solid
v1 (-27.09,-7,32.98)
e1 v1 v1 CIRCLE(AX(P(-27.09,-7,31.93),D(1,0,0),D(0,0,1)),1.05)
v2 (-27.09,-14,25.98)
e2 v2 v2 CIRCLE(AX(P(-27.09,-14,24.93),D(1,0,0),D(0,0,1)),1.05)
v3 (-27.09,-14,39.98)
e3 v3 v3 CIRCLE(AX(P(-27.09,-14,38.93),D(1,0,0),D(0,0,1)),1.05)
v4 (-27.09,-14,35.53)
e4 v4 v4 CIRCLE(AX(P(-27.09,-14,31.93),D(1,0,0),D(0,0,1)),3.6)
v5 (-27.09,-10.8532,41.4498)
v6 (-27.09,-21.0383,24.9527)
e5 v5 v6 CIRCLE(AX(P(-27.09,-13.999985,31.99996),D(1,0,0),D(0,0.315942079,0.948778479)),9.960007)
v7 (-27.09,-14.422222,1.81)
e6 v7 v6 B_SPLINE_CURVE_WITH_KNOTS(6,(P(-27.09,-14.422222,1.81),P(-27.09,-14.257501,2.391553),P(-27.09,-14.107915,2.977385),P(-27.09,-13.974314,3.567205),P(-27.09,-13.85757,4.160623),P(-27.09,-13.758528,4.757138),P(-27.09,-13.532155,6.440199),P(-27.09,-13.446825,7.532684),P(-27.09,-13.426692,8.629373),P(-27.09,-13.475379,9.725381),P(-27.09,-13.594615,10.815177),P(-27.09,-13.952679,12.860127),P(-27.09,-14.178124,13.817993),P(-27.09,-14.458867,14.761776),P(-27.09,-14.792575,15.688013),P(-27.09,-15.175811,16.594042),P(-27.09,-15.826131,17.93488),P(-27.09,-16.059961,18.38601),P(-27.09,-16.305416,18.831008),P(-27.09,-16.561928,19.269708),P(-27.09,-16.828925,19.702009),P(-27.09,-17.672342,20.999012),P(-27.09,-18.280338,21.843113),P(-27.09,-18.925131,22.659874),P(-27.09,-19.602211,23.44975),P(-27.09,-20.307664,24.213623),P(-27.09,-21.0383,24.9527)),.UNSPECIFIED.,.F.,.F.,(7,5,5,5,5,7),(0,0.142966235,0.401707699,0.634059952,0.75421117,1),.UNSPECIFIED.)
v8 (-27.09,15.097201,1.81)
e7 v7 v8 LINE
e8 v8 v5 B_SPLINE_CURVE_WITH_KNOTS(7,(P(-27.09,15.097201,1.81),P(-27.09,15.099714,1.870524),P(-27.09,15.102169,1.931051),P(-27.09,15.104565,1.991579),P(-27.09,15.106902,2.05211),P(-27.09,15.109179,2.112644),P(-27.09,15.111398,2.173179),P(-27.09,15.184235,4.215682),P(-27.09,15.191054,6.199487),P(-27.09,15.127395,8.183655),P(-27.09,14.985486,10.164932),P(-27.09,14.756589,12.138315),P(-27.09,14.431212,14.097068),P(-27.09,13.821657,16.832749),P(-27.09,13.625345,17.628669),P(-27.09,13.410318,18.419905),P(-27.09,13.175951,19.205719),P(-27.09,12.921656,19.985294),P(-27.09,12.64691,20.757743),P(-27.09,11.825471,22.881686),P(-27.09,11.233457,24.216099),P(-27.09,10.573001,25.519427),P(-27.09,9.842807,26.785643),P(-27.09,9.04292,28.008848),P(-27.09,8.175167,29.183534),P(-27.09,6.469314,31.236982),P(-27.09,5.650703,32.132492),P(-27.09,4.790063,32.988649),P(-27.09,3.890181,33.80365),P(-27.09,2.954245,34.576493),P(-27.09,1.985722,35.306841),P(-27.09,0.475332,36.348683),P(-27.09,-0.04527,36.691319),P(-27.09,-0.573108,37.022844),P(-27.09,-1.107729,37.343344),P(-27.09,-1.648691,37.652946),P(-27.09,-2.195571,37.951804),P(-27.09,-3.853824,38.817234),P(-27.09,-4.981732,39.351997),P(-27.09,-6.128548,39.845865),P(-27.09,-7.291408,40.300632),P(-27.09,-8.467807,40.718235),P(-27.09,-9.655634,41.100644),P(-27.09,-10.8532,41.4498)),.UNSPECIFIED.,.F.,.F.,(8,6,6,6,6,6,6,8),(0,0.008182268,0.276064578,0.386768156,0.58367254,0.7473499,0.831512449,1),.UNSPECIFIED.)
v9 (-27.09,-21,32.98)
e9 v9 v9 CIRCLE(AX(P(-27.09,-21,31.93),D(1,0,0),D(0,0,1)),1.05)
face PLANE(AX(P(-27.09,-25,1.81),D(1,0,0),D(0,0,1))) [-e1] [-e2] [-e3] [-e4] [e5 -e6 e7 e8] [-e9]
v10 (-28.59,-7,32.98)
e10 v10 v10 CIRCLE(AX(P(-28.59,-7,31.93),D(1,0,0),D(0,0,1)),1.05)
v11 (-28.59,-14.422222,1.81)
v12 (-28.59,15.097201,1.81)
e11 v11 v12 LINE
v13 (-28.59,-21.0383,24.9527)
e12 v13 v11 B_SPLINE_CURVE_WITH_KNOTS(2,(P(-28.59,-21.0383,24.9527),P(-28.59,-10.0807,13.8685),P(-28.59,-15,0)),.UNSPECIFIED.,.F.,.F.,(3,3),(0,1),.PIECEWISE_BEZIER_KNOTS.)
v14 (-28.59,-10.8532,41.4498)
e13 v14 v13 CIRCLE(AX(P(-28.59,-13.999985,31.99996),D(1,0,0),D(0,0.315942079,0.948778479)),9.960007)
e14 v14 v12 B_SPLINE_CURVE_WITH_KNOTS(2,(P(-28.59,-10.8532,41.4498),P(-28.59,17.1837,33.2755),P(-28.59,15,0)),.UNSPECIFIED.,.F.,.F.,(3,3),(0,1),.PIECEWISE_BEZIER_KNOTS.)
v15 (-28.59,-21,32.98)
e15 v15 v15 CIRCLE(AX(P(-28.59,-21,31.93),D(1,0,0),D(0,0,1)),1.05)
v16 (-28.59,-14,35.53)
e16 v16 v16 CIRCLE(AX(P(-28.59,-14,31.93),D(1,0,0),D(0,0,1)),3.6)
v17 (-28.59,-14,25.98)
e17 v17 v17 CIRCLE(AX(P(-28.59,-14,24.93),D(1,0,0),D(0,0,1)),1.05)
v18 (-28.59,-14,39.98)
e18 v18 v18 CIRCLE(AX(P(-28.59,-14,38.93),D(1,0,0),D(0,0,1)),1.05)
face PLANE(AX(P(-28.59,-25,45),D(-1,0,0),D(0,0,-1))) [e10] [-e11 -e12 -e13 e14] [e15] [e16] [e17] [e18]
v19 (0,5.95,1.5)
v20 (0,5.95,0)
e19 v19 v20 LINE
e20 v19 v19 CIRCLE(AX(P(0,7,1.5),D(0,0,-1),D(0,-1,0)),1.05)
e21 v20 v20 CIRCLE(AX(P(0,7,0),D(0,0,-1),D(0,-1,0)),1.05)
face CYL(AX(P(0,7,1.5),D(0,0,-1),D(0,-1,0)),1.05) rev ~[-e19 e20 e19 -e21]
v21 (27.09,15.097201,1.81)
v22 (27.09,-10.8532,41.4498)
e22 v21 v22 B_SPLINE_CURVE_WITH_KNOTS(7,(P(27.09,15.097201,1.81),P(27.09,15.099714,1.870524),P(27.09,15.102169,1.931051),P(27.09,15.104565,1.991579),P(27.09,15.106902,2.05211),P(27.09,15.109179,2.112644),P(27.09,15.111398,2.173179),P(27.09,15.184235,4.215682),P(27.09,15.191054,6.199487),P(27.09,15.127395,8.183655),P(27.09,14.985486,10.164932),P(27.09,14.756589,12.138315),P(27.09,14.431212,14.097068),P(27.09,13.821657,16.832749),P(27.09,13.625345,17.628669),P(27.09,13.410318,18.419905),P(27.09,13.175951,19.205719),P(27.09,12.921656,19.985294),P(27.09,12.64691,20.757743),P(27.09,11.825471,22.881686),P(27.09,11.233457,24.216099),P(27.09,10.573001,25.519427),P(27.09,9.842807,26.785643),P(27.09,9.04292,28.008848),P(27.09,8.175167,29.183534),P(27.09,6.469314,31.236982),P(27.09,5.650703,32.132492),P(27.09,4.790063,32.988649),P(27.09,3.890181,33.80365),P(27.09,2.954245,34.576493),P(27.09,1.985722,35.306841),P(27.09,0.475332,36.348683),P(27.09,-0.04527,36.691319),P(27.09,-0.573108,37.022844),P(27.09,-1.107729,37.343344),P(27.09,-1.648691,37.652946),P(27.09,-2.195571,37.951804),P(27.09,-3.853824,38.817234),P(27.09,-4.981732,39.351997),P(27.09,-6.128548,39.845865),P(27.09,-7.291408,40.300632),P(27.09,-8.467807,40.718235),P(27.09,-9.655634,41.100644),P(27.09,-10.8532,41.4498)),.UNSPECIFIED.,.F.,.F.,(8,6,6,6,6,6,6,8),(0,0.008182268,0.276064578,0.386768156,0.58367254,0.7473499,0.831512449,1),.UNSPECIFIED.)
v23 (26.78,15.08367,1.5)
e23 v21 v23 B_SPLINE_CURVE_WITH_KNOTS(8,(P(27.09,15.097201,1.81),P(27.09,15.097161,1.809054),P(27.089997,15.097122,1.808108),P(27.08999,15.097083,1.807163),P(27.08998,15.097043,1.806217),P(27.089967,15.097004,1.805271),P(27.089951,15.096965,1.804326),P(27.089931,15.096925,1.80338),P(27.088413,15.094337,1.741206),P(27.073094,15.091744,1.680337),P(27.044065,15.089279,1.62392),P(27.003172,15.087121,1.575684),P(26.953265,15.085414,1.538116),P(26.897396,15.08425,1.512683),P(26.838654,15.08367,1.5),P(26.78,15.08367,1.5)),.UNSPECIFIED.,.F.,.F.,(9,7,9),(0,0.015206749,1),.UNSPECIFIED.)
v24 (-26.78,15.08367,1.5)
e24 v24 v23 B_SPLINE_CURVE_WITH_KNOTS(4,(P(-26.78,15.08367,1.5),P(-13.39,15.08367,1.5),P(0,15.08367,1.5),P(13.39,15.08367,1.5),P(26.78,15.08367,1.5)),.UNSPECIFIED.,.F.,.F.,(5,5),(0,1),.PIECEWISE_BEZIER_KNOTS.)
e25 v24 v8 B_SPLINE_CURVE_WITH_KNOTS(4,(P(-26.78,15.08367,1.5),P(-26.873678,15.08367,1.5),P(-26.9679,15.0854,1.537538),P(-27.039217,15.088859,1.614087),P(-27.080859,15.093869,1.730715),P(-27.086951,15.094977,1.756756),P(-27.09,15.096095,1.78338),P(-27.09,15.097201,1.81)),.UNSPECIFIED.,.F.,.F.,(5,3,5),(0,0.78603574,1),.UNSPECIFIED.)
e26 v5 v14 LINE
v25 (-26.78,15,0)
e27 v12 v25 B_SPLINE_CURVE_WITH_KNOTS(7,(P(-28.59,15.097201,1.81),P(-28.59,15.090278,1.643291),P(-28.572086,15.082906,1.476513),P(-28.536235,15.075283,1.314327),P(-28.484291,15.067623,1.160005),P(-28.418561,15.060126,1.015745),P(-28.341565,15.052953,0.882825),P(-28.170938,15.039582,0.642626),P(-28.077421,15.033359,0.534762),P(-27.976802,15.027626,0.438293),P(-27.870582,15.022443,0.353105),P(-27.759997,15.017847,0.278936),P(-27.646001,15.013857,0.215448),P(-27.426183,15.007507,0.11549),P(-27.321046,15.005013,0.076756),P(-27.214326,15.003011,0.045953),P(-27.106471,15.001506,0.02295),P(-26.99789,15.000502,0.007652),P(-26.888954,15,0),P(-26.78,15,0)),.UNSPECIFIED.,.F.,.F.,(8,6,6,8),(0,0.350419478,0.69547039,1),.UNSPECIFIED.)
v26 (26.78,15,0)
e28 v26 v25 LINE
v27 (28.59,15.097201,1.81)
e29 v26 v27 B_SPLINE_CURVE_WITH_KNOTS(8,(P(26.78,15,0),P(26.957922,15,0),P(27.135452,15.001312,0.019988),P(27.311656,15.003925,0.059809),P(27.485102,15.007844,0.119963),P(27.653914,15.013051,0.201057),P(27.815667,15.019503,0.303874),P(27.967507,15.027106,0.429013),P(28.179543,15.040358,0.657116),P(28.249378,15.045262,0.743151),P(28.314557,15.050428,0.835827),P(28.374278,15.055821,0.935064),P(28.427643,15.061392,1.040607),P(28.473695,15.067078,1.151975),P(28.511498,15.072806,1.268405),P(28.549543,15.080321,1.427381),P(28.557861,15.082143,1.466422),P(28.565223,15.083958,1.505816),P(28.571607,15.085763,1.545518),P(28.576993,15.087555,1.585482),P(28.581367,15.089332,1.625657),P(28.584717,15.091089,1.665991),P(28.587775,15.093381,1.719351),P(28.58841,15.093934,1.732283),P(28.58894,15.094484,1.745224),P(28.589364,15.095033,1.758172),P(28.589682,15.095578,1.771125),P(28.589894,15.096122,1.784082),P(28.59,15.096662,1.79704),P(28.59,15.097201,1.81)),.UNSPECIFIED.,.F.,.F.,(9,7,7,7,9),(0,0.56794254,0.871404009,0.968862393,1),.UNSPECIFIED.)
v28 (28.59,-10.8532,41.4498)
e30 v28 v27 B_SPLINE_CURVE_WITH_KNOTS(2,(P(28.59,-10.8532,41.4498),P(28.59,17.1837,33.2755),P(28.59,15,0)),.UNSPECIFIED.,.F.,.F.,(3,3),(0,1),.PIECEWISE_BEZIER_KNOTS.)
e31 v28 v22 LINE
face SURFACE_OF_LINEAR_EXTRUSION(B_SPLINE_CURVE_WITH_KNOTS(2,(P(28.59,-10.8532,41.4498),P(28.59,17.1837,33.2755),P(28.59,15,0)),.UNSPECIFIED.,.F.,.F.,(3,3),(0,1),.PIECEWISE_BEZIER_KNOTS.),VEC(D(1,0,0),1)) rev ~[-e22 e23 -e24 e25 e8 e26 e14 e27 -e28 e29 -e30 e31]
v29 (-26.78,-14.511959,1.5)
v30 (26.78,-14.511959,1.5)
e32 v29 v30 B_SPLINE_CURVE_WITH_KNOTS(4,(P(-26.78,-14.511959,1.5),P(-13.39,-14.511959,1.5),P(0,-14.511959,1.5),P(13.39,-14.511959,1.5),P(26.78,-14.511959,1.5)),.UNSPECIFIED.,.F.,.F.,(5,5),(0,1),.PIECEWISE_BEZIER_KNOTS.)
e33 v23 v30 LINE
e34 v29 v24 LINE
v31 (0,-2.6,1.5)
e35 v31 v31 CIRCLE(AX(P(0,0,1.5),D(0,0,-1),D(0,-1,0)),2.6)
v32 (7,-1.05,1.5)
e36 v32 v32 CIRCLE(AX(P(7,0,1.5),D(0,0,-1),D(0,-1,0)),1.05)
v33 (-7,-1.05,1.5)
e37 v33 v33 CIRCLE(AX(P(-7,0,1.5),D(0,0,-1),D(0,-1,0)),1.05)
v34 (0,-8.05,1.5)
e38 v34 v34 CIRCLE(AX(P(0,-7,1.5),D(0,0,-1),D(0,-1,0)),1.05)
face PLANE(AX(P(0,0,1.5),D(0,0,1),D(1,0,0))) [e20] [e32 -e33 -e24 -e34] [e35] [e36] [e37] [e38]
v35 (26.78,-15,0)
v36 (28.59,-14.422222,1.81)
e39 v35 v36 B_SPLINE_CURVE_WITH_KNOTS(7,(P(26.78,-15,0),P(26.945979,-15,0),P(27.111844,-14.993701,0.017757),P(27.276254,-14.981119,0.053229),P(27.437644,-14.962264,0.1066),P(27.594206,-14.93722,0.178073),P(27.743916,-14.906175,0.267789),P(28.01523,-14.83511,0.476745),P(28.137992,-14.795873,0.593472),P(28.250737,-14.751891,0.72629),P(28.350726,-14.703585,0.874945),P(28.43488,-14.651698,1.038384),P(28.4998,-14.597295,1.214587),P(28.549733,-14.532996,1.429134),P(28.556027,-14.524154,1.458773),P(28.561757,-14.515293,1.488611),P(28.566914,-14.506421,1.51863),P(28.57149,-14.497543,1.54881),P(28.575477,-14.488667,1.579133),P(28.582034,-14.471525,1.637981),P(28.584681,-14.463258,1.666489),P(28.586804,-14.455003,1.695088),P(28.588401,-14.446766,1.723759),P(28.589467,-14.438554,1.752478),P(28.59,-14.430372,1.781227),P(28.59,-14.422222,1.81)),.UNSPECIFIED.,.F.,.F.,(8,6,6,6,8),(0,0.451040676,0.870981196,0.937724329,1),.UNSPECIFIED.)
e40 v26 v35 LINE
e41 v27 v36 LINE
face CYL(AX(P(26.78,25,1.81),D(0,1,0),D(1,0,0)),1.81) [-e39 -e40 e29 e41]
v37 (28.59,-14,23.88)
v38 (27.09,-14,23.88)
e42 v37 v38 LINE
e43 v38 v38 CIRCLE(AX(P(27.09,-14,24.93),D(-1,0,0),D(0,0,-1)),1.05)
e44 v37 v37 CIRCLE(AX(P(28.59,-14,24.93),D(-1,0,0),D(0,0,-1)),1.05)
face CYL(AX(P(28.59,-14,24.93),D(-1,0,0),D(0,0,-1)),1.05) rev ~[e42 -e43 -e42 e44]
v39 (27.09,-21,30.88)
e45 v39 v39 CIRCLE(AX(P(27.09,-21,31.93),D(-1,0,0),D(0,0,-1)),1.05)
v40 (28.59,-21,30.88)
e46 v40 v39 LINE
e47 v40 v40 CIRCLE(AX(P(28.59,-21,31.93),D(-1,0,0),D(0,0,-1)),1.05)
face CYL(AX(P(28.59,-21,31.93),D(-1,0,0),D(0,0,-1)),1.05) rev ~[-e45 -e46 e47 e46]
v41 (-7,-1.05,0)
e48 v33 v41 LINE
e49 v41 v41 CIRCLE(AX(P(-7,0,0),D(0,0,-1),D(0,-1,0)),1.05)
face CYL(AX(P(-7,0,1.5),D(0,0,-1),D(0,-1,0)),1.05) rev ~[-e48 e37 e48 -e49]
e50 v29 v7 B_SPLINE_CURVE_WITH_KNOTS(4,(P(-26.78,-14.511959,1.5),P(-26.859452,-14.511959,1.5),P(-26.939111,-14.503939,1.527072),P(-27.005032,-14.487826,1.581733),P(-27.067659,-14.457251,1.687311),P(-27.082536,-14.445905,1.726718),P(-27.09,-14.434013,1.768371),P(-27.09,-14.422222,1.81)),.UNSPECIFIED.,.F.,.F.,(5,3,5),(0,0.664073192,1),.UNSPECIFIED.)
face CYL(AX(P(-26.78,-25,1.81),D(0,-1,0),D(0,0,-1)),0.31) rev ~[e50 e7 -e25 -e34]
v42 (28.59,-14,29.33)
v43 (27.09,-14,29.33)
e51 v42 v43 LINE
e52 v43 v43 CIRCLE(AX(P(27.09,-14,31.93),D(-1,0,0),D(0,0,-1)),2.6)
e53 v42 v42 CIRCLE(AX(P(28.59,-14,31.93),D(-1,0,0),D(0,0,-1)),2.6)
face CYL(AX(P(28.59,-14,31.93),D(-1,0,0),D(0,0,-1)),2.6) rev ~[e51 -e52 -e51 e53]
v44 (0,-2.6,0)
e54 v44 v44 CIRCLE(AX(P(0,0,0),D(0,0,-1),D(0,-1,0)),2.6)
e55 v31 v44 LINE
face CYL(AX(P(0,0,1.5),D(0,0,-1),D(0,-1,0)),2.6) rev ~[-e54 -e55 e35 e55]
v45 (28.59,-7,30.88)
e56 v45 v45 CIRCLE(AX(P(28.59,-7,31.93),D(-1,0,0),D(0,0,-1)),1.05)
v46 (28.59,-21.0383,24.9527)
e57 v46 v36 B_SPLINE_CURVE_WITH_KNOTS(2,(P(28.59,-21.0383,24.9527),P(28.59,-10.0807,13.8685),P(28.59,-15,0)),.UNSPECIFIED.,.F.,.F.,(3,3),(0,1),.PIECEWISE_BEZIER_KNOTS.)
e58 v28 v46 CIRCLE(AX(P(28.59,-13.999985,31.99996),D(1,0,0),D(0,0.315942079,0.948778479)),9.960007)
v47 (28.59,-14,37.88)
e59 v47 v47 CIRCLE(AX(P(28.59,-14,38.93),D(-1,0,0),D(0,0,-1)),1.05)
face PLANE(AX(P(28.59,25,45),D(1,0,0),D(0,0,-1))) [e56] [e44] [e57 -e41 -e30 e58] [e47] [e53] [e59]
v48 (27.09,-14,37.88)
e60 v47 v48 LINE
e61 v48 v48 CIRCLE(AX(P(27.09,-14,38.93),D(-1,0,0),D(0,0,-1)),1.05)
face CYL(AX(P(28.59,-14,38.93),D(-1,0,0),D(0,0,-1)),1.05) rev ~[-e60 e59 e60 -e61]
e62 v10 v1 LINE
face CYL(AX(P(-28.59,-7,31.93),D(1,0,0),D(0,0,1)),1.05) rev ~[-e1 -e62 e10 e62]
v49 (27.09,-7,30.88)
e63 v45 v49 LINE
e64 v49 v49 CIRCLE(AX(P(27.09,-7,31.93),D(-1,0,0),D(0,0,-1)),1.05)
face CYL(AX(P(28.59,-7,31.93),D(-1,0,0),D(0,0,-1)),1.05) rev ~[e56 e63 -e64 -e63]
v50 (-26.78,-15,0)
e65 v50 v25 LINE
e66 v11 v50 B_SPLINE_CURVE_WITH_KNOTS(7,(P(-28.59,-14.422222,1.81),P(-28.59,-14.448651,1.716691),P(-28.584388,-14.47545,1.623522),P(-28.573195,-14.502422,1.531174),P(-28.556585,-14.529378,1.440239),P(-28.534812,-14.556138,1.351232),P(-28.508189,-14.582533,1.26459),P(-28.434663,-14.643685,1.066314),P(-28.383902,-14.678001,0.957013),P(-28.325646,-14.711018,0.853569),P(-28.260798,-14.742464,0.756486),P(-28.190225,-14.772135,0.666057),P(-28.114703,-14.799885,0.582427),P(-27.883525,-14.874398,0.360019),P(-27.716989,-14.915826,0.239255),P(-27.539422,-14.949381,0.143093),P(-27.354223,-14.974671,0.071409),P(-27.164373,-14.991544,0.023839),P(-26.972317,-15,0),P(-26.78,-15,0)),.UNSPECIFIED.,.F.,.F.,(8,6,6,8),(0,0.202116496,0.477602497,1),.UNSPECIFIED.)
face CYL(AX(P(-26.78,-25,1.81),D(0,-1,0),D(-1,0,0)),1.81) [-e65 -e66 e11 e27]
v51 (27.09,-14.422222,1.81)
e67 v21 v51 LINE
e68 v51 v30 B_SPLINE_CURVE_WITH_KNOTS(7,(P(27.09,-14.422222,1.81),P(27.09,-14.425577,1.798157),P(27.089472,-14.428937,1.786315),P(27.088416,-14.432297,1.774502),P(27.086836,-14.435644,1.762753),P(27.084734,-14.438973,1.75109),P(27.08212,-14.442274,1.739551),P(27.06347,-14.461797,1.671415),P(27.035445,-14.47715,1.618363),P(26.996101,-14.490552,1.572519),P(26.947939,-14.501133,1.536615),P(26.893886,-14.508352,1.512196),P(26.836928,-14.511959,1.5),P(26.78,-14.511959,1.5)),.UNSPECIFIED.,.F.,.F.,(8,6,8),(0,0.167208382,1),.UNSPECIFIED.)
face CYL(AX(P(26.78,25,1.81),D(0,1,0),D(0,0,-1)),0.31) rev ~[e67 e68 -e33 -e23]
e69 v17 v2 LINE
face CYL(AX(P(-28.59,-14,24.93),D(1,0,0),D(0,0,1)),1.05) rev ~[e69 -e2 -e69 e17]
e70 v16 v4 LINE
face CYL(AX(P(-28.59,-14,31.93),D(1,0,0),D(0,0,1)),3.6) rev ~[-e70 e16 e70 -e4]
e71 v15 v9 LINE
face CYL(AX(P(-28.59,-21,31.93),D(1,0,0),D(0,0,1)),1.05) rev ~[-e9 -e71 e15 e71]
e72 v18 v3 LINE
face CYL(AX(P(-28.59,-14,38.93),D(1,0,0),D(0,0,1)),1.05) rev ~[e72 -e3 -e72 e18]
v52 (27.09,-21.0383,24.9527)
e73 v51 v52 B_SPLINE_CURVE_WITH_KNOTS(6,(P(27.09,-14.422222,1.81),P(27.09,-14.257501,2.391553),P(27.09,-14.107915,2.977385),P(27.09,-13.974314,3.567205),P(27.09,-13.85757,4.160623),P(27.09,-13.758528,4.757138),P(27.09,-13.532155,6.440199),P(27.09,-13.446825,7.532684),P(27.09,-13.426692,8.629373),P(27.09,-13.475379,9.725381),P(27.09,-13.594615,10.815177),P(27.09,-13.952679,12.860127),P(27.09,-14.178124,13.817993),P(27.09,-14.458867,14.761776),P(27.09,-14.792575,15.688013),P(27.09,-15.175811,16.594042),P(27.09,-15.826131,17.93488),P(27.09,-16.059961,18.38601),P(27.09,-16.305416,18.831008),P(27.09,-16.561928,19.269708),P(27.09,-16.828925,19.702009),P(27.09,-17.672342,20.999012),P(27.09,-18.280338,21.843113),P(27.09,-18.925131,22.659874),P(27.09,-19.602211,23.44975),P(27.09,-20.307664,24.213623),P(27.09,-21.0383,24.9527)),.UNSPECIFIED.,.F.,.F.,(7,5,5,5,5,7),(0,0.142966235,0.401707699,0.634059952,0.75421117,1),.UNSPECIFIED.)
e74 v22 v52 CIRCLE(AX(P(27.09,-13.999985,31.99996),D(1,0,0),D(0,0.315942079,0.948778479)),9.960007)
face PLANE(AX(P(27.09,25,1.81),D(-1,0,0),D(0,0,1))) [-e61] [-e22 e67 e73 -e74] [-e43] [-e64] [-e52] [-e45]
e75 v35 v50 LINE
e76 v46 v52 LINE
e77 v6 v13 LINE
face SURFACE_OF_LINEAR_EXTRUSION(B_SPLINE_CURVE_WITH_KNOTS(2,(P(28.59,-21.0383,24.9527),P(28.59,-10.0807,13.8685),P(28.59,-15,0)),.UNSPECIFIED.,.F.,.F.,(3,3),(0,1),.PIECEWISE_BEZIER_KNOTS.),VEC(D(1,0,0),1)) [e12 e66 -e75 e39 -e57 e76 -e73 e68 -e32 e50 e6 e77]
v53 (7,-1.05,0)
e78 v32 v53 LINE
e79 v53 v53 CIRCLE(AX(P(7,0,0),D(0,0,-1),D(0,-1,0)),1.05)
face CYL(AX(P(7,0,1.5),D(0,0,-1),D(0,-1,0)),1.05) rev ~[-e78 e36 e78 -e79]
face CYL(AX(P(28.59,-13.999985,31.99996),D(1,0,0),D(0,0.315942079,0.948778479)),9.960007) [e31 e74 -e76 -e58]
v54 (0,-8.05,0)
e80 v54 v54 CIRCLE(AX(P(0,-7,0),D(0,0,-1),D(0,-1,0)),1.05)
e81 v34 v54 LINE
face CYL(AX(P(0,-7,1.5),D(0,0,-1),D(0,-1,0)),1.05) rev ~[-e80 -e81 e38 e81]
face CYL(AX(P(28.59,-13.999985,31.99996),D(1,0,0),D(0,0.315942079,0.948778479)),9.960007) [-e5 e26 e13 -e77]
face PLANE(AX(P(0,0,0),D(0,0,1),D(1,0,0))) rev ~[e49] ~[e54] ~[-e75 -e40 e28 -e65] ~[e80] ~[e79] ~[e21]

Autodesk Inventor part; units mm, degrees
ref_plane "YZ Plane" through (0, 0, 0) normal (1, 0, 0) x (0, 1, 0)
ref_plane "XZ Plane" through (0, 0, 0) normal (0, 1, 0) x (-1, 0, 0)
ref_plane "XY Plane" through (0, 0, 0) normal (0, 0, 1) x (1, 0, 0)
sketch "Sketch1" plane through (0, 0, 0) normal (0, 0, 1) x (1, 0, 0)
  line L0 (-28.59, -25) -> (28.59, -25)
  line L1 (28.59, -25) -> (28.59, 25)
  line L2 (28.59, 25) -> (-28.59, 25)
  line L3 (-28.59, 25) -> (-28.59, -25)
  line L4 (-28.59, -25) -> (28.59, 25) construction
  line L5 (28.59, -25) -> (-28.59, 25) construction
  point P0 (0, 0)
  dimension "d0" = 57.18
  dimension "d1" = 50
extrude "Plate1" add sketch "Sketch1" along normal blind 1.5
sketch "Sketch2" plane through (-27.09, -25, 0) normal (-1, 0, 0) x (0, -1, 0)
  line L0 (-50, 0) -> (0, 0)
  line L1 (0, 0) -> (0, 45)
  line L2 (0, 45) -> (-50, 45)
  line L3 (-50, 45) -> (-50, 0)
edge flange "Flange1" height 45 angle 90 thickness 1.5 bend radius 0.31 thickness toward (-1, 0, 0) relief tear relief width 1.5 relief depth 0.75 corner gap 0.31 corner form 0 edges at (-28.59, 0, 1.5) (28.59, 0, 1.5) wall of the first edge with corners at (-27.09, 25, 0) (-27.09, -25, 0) (-27.09, -25, 45) (-27.09, 25, 45)
bend "Bend1"
corner "Corner1"
sketch "Sketch17" plane through (0, 0, 1.5) normal (0, 0, 1) x (1, 0, 0)
  circle A0 centre (0, 7) radius 0.7835
  circle A1 centre (7, 0) radius 0.7835
  circle A2 centre (0, -7) radius 0.7835
  circle A3 centre (-7, 0) radius 0.7835
  point P0 (0, 0)
hole "Hole7" at (0, 7, 1.5) at (7, 0, 1.5) at (0, -7, 1.5) at (-7, 0, 1.5) direction (0, 0, -1) diameter 2.1 depth 1.5
sketch "Sketch26" plane through (28.59, -25, 45) normal (1, 0, 0) x (0, 0, -1)
  arc A0 (3.5502, 14.1468) -> (20.0473, 3.9617) centre (13, 11) ccw
  line L0 (45, 50) -> (45, 0) projected
  spline S0 degree 2 poles (3.5502, 14.1468) (11.7245, 42.1837) (45, 40) knots 0 0 0 1 1 1
  spline S1 degree 2 poles (20.0473, 3.9617) (31.1315, 14.9193) (45, 10) knots 0 0 0 1 1 1
  line L1 (45, 10) -> (45, 40)
  line L2 (0, 0) -> (45, 0)
  line L3 (45, 0) -> (45, 50)
  line L4 (45, 50) -> (0, 50)
  line L5 (0, 50) -> (0, 0)
  point P0 (45, 25)
  point P1 (45, 25)
  point P2 (17.1562, 34.0829)
  point P3 (32.0366, 10.9995)
  dimension "d143" = 19.92
  dimension "d144" = 32
  dimension "d145" = 14
  dimension "d160" = 15
  dimension "d161" = 15
  dimension "d162" = 7.0473
  dimension "d163" = 9.4498
  dimension "d164" = 19.0366
  dimension "d165" = 7.0378
  dimension "d166" = 13.606
  dimension "d167" = 19.9361
extrude "Cut8" cut sketch "Sketch26" against normal blind 57.18 contours A0 S1 L0 L2 L5 L4 S0
sketch "Sketch27" plane through (-28.59, -14.4222, 1.81) normal (-1, 0, 0) x (0, 0, 1)
  circle A0 centre (23.12, 0.4222) radius 0.7835 projected
  circle A1 centre (30.12, -6.5778) radius 0.7835 projected
  circle A2 centre (30.12, 7.4222) radius 0.7835 projected
  circle A3 centre (37.12, 0.4222) radius 0.7835 projected
  point P0 (-1.81, 14.4222)
hole "Hole15" at (-28.59, -14, 24.93) at (-28.59, -7, 31.93) at (-28.59, -21, 31.93) at (-28.59, -14, 38.93) direction (1, 0, 0) diameter 2.1 depth 1.5
sketch "Sketch28" plane through (28.59, -14.4222, 1.81) normal (1, 0, 0) x (0, 0, -1)
  circle A0 centre (-23.12, 0.4222) radius 0.7835 projected
  circle A1 centre (-30.12, -6.5778) radius 0.7835 projected
  circle A2 centre (-37.12, 0.4222) radius 0.7835 projected
  circle A3 centre (-30.12, 7.4222) radius 0.7835 projected
  point P0 (1.81, 14.4222)
hole "Hole16" at (28.59, -14, 24.93) at (28.59, -7, 31.93) at (28.59, -21, 31.93) at (28.59, -14, 38.93) direction (-1, 0, 0) diameter 2.1 depth 1.5
sketch "Sketch29" plane through (-28.59, -14.4222, 1.81) normal (-1, 0, 0) x (0, 0, 1)
  circle A0 centre (30.12, 0.4222) radius 1.2295 projected
  point P0 (-1.81, 14.4222)
hole "Hole17" at (-28.59, -14, 31.93) direction (1, 0, 0) diameter 7.2 depth 1.5
sketch "Sketch30" plane through (28.59, -14.4222, 1.81) normal (1, 0, 0) x (0, 0, -1)
  circle A0 centre (-30.12, 0.4222) radius 1.75 projected
  point P0 (1.81, 14.4222)
hole "Hole18" at (28.59, -14, 31.93) direction (-1, 0, 0) diameter 5.2 depth 1.5
sketch "Sketch31" plane through (0, 0, 1.5) normal (0, 0, 1) x (1, 0, 0)
  circle A0 centre (0, 0) radius 1.75 projected
  point P0 (0, 0)
hole "Hole19" at (0, 0, 1.5) direction (0, 0, -1) diameter 5.2 depth 1.5
equation "\"d90\" = Thickness"
equation "\"d2\" = Thickness"
equation "\"d3\" = BendReliefWidth"
equation "\"d4\" = BendReliefDepth"
equation "\"d5\" = MinimumRemnant"
equation "\"d6\" = TransitionRadius"
equation "\"d9\" = BendRadius"
equation "\"d10\" = CornerReliefSize"
equation "\"d11\" = GapSize"
equation "\"d12\" = JacobiRadiusSize"
equation "\"BendReliefWidth\" = Thickness"
equation "\"BendReliefDepth\" = 0.5 * Thickness"
equation "\"CornerReliefSize\" = 4 * Thickness"
equation "\"MinimumRemnant\" = 2 * Thickness"
equation "\"TransitionRadius\" = BendRadius"
equation "\"JacobiRadiusSize\" = BendRadius"
equation "\"GapSize\" = Thickness"
equation "\"Thickness\" = 1.5"
equation "\"BendRadius\" = 0.31"
properties part number "axis_15_bottom_frame" material "Aluminum 6061-AHC"
